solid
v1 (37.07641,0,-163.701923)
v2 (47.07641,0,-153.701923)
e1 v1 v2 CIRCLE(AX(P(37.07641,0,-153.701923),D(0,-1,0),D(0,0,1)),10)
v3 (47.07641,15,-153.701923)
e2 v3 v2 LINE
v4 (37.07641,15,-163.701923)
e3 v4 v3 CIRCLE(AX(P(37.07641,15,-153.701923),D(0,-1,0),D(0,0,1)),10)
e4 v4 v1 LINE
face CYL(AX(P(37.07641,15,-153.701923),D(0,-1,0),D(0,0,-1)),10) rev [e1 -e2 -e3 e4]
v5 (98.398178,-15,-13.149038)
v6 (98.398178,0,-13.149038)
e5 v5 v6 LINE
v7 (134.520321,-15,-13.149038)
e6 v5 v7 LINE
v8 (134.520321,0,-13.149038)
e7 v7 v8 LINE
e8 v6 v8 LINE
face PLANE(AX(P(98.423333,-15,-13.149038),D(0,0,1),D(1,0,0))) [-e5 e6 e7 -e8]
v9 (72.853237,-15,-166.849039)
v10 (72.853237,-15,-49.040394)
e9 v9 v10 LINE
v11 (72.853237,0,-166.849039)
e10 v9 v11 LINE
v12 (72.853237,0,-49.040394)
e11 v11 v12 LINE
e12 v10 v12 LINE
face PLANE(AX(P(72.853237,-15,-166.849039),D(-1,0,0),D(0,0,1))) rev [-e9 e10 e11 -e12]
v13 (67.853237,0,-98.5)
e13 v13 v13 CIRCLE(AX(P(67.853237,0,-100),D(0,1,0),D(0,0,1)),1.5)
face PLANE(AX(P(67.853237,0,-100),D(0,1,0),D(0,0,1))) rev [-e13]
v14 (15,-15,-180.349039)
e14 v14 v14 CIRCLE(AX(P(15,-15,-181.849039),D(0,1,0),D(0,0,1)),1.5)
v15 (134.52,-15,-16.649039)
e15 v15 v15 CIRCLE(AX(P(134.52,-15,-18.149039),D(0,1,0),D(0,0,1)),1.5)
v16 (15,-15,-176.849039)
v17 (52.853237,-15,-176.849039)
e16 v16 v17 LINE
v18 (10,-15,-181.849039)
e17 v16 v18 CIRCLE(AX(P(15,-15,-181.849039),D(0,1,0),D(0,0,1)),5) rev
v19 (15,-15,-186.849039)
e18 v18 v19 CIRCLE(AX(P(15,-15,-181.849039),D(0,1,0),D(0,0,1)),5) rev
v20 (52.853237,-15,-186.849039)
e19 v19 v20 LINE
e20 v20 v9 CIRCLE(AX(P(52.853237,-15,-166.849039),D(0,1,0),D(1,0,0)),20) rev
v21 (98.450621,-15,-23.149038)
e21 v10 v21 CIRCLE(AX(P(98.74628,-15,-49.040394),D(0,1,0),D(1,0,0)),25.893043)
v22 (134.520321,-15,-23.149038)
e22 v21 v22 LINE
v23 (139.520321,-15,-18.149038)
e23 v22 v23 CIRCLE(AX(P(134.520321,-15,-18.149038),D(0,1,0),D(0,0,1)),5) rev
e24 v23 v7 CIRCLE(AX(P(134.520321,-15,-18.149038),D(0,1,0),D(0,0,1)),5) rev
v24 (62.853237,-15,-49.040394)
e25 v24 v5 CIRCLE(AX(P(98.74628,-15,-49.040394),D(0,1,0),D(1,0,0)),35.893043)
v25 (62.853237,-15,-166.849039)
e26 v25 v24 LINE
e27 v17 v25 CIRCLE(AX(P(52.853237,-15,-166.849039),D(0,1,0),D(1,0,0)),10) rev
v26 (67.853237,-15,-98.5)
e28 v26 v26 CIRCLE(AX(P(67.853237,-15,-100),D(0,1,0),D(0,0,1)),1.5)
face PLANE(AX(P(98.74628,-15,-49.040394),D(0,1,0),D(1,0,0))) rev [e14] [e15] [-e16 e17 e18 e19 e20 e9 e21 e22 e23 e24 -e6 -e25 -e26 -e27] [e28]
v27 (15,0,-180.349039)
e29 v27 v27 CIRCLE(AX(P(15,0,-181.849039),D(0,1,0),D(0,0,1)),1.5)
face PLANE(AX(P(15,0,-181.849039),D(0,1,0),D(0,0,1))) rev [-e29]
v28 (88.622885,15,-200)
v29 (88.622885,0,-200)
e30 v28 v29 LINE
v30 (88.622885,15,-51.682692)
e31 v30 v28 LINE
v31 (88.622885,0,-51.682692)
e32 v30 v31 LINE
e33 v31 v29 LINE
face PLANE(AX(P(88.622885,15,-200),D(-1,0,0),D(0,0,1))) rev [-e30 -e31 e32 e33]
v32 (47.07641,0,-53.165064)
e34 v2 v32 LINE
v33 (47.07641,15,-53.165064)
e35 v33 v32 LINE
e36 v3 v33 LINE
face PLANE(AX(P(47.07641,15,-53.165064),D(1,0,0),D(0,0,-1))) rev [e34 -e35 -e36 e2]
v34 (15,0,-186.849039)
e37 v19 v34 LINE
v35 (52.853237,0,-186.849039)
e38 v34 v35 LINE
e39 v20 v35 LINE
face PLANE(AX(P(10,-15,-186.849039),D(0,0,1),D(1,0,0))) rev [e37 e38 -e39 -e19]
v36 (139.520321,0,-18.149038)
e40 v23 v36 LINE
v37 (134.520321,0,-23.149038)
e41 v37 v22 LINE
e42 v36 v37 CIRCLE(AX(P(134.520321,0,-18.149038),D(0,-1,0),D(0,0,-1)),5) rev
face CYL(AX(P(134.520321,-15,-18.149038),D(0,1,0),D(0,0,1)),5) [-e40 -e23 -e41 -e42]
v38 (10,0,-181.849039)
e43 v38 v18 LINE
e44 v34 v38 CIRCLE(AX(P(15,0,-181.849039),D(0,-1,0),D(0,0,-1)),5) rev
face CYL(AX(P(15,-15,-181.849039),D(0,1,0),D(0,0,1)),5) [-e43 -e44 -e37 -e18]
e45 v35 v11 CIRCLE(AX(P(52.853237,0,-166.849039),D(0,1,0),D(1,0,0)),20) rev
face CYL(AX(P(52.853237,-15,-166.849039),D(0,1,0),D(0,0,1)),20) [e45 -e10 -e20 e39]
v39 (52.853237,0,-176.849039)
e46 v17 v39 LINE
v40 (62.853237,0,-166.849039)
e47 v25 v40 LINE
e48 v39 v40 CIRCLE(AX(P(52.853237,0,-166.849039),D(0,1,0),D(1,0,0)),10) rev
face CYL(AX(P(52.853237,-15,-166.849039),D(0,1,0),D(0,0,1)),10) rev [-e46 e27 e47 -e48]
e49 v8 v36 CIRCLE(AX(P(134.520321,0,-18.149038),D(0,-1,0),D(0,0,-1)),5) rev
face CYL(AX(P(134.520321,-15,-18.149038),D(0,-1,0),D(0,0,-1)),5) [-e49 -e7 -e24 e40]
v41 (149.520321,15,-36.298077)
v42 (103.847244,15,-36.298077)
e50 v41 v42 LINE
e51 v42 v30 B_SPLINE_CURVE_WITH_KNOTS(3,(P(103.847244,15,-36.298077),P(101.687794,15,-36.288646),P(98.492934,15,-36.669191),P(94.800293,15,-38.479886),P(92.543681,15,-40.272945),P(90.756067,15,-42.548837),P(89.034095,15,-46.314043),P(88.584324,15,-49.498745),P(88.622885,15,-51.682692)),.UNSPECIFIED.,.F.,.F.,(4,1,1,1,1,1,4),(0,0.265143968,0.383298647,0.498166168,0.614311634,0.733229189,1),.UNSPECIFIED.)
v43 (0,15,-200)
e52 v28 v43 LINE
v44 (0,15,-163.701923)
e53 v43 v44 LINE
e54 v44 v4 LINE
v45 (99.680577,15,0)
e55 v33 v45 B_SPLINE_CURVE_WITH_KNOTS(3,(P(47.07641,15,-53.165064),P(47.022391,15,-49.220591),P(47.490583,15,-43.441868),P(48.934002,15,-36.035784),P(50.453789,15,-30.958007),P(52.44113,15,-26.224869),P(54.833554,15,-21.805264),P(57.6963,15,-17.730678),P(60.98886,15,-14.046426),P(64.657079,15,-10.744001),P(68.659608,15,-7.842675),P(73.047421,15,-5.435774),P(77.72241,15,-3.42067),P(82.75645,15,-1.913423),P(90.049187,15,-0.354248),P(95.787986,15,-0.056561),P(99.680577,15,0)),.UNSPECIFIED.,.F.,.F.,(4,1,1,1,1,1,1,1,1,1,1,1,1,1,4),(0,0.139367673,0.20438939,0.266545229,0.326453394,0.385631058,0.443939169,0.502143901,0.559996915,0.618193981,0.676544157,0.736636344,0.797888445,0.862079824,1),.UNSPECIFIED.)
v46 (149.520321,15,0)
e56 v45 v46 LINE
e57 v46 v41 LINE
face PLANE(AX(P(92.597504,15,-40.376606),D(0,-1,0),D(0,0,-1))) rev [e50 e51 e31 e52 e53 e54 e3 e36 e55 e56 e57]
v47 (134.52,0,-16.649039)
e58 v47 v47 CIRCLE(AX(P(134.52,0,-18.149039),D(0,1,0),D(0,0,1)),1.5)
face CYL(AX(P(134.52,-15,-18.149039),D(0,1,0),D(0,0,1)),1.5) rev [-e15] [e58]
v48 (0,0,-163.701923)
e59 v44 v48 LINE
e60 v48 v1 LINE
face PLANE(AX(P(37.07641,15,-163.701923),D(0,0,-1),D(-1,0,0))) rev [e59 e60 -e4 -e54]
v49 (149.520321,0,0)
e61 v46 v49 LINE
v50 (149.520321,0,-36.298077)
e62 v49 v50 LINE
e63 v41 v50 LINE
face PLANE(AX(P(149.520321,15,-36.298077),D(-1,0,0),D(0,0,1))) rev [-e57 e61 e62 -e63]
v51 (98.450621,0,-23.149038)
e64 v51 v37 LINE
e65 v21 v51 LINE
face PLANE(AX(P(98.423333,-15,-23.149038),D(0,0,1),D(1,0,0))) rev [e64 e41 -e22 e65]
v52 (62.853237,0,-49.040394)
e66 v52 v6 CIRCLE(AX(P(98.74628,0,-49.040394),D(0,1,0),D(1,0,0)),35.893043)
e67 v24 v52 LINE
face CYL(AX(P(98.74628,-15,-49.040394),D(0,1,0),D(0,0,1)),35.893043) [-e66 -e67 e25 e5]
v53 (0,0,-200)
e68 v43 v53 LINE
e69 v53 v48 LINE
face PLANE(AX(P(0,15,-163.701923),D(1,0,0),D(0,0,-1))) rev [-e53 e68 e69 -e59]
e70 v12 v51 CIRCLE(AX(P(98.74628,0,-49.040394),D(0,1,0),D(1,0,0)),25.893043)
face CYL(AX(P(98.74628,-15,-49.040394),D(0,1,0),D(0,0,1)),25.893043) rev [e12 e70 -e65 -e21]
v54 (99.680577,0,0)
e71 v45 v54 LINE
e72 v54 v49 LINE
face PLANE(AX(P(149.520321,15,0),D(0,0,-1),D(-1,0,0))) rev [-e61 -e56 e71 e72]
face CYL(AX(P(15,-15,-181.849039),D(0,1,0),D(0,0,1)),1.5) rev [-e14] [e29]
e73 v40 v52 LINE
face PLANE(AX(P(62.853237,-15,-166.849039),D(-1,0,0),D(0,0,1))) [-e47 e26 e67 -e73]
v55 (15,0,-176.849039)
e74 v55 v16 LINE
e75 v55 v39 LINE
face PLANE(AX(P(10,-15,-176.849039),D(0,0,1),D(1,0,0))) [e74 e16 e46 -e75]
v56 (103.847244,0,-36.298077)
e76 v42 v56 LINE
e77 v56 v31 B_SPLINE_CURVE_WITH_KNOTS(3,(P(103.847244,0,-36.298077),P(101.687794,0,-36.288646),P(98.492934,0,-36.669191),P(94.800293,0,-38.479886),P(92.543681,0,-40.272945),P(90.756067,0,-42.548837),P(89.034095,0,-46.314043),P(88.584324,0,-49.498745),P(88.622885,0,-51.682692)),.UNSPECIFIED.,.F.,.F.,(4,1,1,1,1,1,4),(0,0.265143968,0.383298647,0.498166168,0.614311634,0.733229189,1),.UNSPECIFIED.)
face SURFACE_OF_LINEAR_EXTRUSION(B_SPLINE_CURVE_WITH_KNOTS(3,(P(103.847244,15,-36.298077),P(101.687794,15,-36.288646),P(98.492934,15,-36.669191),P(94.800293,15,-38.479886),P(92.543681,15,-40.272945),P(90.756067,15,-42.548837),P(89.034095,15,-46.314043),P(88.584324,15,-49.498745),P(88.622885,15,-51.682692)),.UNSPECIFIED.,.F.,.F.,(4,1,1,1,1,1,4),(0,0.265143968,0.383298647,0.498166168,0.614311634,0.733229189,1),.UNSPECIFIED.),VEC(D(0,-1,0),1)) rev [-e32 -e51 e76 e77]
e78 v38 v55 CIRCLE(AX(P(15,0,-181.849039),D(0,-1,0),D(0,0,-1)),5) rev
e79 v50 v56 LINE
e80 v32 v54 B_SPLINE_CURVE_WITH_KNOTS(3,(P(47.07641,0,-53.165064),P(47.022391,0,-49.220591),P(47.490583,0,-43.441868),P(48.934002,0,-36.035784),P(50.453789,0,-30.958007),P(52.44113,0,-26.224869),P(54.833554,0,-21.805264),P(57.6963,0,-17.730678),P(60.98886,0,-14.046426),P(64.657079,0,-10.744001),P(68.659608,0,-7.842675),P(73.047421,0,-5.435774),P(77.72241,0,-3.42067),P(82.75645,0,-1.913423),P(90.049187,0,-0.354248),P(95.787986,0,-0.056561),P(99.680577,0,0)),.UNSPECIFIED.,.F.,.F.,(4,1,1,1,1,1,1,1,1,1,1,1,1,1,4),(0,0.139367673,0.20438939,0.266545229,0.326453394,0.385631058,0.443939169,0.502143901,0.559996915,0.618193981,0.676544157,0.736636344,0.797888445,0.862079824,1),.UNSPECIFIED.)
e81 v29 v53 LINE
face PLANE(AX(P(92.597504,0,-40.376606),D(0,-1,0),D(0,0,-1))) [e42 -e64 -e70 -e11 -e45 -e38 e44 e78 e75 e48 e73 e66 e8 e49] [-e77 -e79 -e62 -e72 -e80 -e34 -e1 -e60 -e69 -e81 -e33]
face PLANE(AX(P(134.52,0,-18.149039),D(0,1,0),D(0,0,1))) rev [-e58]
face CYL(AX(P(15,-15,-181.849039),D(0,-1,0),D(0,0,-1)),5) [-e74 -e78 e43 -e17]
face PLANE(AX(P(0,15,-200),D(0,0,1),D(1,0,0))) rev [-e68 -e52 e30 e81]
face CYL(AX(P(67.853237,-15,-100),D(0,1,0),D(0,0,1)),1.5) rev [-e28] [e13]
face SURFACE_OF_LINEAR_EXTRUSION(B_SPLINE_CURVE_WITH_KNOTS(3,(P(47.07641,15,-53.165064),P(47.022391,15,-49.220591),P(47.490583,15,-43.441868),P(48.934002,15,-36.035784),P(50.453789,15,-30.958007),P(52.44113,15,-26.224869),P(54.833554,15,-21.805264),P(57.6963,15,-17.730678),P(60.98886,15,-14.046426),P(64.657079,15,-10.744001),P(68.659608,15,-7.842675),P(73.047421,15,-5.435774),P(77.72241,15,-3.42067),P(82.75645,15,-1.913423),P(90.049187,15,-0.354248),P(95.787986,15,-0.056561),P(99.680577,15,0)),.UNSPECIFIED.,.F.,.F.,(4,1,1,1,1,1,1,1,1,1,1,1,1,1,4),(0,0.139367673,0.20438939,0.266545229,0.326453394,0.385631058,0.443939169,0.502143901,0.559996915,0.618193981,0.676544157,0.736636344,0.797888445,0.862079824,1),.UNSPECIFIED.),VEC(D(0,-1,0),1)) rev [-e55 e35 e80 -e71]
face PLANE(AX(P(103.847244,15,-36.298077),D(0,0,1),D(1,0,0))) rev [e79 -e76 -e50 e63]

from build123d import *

# Parameters (mm, degrees)
EXTRUDE_L_DEPTH        = 15
EXTRUDE_951_DEPTH      = 15
FILLET_1044_R          = 5
SKETCH_1306_R          = 1.5
CUT_EXTRUDE_1314_DEPTH = 251.162599761


with BuildPart() as part:
    # Эскиз l → l (new body)
    with BuildSketch(Plane(origin=(0, 0, 0), x_dir=(1, 0, 0), z_dir=(0, 1, 0))):
        with BuildLine():
            Line((0, 163.701923077), (0, 200))
            Line((0, 200), (88.622884615, 200))
            Line((88.622884615, 200), (88.622884615, 51.682692308))
            add(Edge.make_bspline(
                [(88.622884615, 51.682692308), (88.584324136, 49.498745129), (89.03409536, 46.314042521), (90.756066544, 42.548836596), (92.543680506, 40.272944728), (94.800293255, 38.479885865), (98.492933692, 36.6691907), (101.687793554, 36.288646199), (103.84724359, 36.298076923)],
                knots=[0, 0, 0, 0, 0.266770811, 0.385688366, 0.501833832, 0.616701353, 0.734856032, 1, 1, 1, 1], degree=3))
            Line((103.84724359, 36.298076923), (149.520320513, 36.298076923))
            Line((149.520320513, 36.298076923), (149.520320513, 0))
            Line((149.520320513, 0), (99.680576923, 0))
            add(Edge.make_bspline(
                [(99.680576923, 0), (95.787985552, 0.056561193), (90.049186966, 0.354248464), (82.756449757, 1.913423248), (77.722410387, 3.420669789), (73.047421178, 5.435773635), (68.65960796, 7.842675126), (64.657079117, 10.74400138), (60.988860255, 14.046426407), (57.696300151, 17.73067833), (54.833554235, 21.805264076), (52.441129709, 26.224868693), (50.453789108, 30.958007277), (48.934002029, 36.035784324), (47.490582867, 43.441868234), (47.022391454, 49.220591435), (47.076410256, 53.165064103)],
                knots=[0, 0, 0, 0, 0.137920176, 0.202111555, 0.263363656, 0.323455843, 0.381806019, 0.440003085, 0.497856099, 0.556060831, 0.614368942, 0.673546606, 0.733454771, 0.79561061, 0.860632327, 1, 1, 1, 1], degree=3))
            Line((47.076410256, 53.165064103), (47.076410256, 153.701923077))
            ThreePointArc((47.076410256, 153.701923077), (44.147478068, 160.772990889), (37.076410256, 163.701923077))
            Line((37.076410256, 163.701923077), (0, 163.701923077))
        make_face()
    extrude(amount=EXTRUDE_L_DEPTH)

    # Sketch 848 → Extrude 951 (add)
    with BuildSketch(Plane(origin=(0, 0, 0), x_dir=(1, 0, 0), z_dir=(0, 1, 0))):
        with BuildLine():
            Line((10, 176.8490385), (52.853237, 176.8490385))
            ThreePointArc((52.853237, 176.8490385), (59.924304812, 173.920106312), (62.853237, 166.8490385))
            Line((62.853237, 166.8490385), (62.853237, 49.040393573))
            ThreePointArc((62.853237, 49.040393573), (73.181783835, 23.845809353), (98.223159353, 13.151162754))
            ThreePointArc((98.223159353, 13.151162754), (98.368899816, 13.149569571), (98.514648019, 13.1490385))
            Line((98.514648019, 13.1490385), (139.520321, 13.1490385))
            Line((139.520321, 13.1490385), (139.520321, 23.1490385))
            Line((139.520321, 23.1490385), (98.514648019, 23.1490385))
            ThreePointArc((98.514648019, 23.1490385), (98.441773917, 23.149304035), (98.368903686, 23.150100627))
            ThreePointArc((98.368903686, 23.150100627), (80.304193656, 30.865159632), (72.853237, 49.040393573))
            Line((72.853237, 49.040393573), (72.853237, 166.8490385))
            ThreePointArc((72.853237, 166.8490385), (66.995372624, 180.991174124), (52.853237, 186.8490385))
            Line((52.853237, 186.8490385), (10, 186.8490385))
            Line((10, 186.8490385), (10, 176.8490385))
        make_face()
    extrude(amount=-EXTRUDE_951_DEPTH)

    # Fillet 1044
    fillet_1044_edges = [part.edges().sort_by_distance(p)[0] for p in [
        (139.520321, -7.5, -13.1490385),
        (139.520321, -7.5, -23.1490385),
        (10, -7.5, -176.8490385),
        (10, -7.5, -186.8490385),
    ]]
    fillet(fillet_1044_edges, radius=FILLET_1044_R - 0.0001)  # a hair under: the kernel refuses the full size

    # Sketch 1306 → Cut-Extrude 1314 (cut, through all)
    with BuildSketch(Plane(origin=(0, 0, 0), x_dir=(1, 0, 0), z_dir=(0, 1, 0))):
        with Locations(Location((15, 181.849039, 0), (0, 0, 270))):
            Circle(SKETCH_1306_R)
        with Locations(Location((67.853237, 100, 0), (0, 0, 270))):
            Circle(SKETCH_1306_R)
        with Locations(Location((134.52, 18.149039, 0), (0, 0, 270))):
            Circle(SKETCH_1306_R)
    extrude(amount=-CUT_EXTRUDE_1314_DEPTH, mode=Mode.SUBTRACT)


solid = part.part
